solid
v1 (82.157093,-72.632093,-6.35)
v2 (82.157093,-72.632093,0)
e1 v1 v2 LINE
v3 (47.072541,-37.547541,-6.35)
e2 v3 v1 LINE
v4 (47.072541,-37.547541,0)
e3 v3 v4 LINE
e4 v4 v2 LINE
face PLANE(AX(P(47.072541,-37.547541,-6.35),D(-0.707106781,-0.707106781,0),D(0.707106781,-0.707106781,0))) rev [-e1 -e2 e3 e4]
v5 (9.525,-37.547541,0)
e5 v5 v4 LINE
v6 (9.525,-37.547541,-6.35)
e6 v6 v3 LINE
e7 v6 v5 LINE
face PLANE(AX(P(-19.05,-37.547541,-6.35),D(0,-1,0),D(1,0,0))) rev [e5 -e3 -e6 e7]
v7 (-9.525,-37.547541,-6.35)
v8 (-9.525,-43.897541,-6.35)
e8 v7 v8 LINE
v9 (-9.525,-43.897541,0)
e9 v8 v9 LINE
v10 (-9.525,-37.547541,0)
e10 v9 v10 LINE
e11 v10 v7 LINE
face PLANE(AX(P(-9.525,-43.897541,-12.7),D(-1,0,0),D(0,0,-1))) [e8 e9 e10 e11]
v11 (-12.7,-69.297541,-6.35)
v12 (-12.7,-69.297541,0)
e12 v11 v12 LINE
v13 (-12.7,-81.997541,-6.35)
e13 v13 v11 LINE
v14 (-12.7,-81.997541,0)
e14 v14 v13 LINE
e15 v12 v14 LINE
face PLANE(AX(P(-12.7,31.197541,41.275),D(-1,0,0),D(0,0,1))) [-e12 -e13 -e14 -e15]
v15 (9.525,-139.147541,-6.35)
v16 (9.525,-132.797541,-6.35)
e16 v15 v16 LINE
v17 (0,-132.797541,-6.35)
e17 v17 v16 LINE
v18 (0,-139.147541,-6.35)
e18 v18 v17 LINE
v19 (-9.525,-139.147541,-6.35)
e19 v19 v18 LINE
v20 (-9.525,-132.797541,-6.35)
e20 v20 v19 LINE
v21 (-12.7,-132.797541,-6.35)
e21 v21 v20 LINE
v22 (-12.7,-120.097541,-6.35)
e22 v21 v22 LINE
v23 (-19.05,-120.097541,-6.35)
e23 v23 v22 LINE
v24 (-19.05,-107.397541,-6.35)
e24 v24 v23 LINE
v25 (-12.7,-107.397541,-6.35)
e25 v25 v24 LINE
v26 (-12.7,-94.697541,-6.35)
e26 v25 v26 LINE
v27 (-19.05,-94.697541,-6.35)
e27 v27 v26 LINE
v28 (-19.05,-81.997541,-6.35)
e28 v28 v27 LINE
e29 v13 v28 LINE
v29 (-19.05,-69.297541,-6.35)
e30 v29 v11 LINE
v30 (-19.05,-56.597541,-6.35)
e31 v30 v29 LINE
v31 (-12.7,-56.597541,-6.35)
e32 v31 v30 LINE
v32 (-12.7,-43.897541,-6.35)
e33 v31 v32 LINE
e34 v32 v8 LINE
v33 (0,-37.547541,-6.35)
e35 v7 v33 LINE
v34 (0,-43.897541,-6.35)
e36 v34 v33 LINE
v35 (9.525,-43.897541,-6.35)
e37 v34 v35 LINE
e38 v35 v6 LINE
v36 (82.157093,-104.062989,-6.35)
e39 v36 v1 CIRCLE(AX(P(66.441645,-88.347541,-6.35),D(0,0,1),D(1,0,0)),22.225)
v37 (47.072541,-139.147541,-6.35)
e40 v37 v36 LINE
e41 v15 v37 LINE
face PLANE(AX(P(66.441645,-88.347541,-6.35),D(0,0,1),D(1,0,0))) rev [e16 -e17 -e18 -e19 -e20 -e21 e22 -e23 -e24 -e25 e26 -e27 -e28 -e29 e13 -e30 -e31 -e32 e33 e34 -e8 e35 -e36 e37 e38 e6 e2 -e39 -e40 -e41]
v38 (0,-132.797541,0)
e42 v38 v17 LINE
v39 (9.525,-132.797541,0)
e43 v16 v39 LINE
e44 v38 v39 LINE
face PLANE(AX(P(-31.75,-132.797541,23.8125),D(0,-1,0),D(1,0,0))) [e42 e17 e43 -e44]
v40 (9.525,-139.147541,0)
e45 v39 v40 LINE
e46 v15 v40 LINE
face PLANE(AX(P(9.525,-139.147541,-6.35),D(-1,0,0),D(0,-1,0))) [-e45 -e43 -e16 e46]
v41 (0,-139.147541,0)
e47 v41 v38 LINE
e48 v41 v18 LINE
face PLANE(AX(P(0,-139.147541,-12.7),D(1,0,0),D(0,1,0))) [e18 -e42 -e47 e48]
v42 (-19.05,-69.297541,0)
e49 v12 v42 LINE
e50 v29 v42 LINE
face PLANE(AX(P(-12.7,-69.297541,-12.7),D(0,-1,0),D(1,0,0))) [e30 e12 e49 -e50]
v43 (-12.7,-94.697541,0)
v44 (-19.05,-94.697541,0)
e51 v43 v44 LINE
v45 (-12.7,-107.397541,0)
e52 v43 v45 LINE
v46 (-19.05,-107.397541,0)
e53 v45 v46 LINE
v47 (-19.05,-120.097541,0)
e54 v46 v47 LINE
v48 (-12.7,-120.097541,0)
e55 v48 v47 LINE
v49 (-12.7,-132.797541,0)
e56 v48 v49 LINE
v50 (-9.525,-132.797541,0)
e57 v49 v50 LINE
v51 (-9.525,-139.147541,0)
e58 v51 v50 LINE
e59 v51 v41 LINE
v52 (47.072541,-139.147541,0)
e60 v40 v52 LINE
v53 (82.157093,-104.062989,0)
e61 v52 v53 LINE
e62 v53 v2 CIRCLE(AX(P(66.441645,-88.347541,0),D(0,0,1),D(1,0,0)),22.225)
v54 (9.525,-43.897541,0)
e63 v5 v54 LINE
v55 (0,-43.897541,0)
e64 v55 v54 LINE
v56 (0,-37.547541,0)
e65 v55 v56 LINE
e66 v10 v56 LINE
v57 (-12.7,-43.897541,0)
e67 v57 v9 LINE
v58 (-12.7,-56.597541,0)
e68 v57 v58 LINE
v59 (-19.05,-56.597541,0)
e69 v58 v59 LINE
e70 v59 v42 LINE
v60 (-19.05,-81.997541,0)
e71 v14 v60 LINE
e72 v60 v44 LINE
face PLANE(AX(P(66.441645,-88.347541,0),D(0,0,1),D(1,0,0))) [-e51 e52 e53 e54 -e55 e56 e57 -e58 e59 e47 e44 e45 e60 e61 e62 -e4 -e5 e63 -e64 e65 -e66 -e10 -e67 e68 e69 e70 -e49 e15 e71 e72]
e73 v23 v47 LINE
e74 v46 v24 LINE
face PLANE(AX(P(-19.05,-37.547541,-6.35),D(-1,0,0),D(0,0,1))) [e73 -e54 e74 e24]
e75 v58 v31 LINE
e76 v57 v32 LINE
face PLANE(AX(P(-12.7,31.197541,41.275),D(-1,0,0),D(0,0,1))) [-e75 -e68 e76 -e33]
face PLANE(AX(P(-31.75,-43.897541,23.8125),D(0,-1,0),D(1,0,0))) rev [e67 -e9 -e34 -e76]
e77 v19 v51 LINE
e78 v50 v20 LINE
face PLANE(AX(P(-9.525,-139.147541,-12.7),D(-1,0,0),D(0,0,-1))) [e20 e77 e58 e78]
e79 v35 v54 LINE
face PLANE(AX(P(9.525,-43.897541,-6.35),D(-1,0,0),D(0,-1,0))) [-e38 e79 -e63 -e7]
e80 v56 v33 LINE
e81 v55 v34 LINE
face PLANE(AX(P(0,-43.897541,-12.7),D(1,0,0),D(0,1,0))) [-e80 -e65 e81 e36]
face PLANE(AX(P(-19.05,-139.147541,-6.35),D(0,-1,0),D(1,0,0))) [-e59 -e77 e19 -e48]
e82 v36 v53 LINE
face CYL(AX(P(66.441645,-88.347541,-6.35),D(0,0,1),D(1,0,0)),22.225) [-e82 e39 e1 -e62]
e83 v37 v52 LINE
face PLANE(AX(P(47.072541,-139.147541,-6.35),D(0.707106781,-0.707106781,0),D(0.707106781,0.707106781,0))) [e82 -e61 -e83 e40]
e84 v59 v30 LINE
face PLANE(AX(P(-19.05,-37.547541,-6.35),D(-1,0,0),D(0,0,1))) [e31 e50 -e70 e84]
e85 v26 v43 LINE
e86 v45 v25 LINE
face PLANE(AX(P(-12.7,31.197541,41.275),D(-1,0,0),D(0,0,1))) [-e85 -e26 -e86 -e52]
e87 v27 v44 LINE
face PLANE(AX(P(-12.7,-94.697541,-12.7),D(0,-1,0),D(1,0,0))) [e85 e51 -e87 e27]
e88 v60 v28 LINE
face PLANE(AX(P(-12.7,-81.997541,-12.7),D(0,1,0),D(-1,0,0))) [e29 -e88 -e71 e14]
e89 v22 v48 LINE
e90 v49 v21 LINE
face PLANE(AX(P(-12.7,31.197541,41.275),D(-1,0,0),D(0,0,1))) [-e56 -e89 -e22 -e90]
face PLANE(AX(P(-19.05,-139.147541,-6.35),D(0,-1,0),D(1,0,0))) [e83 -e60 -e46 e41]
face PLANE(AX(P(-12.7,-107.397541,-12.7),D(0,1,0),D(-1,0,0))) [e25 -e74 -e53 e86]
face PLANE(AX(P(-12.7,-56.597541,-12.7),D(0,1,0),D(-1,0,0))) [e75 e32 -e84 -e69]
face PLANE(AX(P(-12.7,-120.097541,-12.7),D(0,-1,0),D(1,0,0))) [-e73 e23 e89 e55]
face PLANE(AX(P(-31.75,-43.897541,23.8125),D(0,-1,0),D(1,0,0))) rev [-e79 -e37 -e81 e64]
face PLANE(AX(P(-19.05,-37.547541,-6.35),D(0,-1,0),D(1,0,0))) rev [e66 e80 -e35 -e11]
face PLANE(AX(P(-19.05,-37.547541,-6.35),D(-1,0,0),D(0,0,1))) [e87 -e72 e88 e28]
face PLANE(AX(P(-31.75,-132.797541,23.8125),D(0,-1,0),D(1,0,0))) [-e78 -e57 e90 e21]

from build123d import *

# Parameters (mm, degrees)
BOSS_EXTRUDE1_DEPTH = 6.35
CAVITY2_START       = -19.05
CAVITY2_OUTLINE_W   = 19.05
CAVITY2_OUTLINE_H   = 6.35
CAVITY2_OUTLINE_W_2 = 12.7
CAVITY2_DEPTH       = 6.350000002
CAVITY2_2_OUTLINE_W = 6.35
CAVITY2_2_OUTLINE_H = 6.35
CAVITY2_2_DEPTH     = 9.525
CAVITY2_START_2     = -12.699999998
CAVITY2_3_OUTLINE_W = 6.35
CAVITY2_3_OUTLINE_H = 6.35
CAVITY2_3_DEPTH     = 3.174999998


# Read off the part's stored shape, not the designer's step: Cavity2
with BuildPart() as part:
    # Sketch1 → Boss-Extrude1 (new body)
    with BuildSketch(Plane.XY):
        with BuildLine():
            Line((-19.05, -37.547541155), (47.072541155, -37.547541155))
            Line((47.072541155, -37.547541155), (82.157092943, -72.632092943))
            ThreePointArc((82.157092943, -72.632092943), (88.666644731, -88.347541155), (82.157092943, -104.062989367))
            Line((82.157092943, -104.062989367), (47.072541155, -139.147541155))
            Line((47.072541155, -139.147541155), (-19.05, -139.147541155))
            Line((-19.05, -139.147541155), (-19.05, -37.547541155))
        make_face()
    extrude(amount=-BOSS_EXTRUDE1_DEPTH)

    # Cavity2 outline → Cavity2 (cut)
    with BuildSketch(Plane.YZ.offset(CAVITY2_START)):
        with Locations((-129.622541155, -3.175)):
            Rectangle(CAVITY2_OUTLINE_W, CAVITY2_OUTLINE_H)
        with Locations((-101.047541155, -3.175)):
            Rectangle(CAVITY2_OUTLINE_W_2, CAVITY2_OUTLINE_H)
        with Locations((-75.647541155, -3.175)):
            Rectangle(CAVITY2_OUTLINE_W_2, CAVITY2_OUTLINE_H)
        with Locations((-47.072541155, -3.175)):
            Rectangle(CAVITY2_OUTLINE_W, CAVITY2_OUTLINE_H)
    extrude(amount=CAVITY2_DEPTH, mode=Mode.SUBTRACT)

    # Cavity2 2 outline → Cavity2 2 (cut)
    with BuildSketch(Plane.YZ):
        with Locations((-135.972541155, -3.175)):
            Rectangle(CAVITY2_2_OUTLINE_W, CAVITY2_2_OUTLINE_H)
        with Locations((-40.722541155, -3.175)):
            Rectangle(CAVITY2_2_OUTLINE_W, CAVITY2_2_OUTLINE_H)
    extrude(amount=CAVITY2_2_DEPTH, mode=Mode.SUBTRACT)

    # Cavity2 3 outline → Cavity2 3 (cut)
    with BuildSketch(Plane.YZ.offset(CAVITY2_START_2)):
        with Locations((-135.972541155, -3.175)):
            Rectangle(CAVITY2_3_OUTLINE_W, CAVITY2_3_OUTLINE_H)
        with Locations((-40.722541155, -3.175)):
            Rectangle(CAVITY2_3_OUTLINE_W, CAVITY2_3_OUTLINE_H)
    extrude(amount=CAVITY2_3_DEPTH, mode=Mode.SUBTRACT)


solid = part.part
